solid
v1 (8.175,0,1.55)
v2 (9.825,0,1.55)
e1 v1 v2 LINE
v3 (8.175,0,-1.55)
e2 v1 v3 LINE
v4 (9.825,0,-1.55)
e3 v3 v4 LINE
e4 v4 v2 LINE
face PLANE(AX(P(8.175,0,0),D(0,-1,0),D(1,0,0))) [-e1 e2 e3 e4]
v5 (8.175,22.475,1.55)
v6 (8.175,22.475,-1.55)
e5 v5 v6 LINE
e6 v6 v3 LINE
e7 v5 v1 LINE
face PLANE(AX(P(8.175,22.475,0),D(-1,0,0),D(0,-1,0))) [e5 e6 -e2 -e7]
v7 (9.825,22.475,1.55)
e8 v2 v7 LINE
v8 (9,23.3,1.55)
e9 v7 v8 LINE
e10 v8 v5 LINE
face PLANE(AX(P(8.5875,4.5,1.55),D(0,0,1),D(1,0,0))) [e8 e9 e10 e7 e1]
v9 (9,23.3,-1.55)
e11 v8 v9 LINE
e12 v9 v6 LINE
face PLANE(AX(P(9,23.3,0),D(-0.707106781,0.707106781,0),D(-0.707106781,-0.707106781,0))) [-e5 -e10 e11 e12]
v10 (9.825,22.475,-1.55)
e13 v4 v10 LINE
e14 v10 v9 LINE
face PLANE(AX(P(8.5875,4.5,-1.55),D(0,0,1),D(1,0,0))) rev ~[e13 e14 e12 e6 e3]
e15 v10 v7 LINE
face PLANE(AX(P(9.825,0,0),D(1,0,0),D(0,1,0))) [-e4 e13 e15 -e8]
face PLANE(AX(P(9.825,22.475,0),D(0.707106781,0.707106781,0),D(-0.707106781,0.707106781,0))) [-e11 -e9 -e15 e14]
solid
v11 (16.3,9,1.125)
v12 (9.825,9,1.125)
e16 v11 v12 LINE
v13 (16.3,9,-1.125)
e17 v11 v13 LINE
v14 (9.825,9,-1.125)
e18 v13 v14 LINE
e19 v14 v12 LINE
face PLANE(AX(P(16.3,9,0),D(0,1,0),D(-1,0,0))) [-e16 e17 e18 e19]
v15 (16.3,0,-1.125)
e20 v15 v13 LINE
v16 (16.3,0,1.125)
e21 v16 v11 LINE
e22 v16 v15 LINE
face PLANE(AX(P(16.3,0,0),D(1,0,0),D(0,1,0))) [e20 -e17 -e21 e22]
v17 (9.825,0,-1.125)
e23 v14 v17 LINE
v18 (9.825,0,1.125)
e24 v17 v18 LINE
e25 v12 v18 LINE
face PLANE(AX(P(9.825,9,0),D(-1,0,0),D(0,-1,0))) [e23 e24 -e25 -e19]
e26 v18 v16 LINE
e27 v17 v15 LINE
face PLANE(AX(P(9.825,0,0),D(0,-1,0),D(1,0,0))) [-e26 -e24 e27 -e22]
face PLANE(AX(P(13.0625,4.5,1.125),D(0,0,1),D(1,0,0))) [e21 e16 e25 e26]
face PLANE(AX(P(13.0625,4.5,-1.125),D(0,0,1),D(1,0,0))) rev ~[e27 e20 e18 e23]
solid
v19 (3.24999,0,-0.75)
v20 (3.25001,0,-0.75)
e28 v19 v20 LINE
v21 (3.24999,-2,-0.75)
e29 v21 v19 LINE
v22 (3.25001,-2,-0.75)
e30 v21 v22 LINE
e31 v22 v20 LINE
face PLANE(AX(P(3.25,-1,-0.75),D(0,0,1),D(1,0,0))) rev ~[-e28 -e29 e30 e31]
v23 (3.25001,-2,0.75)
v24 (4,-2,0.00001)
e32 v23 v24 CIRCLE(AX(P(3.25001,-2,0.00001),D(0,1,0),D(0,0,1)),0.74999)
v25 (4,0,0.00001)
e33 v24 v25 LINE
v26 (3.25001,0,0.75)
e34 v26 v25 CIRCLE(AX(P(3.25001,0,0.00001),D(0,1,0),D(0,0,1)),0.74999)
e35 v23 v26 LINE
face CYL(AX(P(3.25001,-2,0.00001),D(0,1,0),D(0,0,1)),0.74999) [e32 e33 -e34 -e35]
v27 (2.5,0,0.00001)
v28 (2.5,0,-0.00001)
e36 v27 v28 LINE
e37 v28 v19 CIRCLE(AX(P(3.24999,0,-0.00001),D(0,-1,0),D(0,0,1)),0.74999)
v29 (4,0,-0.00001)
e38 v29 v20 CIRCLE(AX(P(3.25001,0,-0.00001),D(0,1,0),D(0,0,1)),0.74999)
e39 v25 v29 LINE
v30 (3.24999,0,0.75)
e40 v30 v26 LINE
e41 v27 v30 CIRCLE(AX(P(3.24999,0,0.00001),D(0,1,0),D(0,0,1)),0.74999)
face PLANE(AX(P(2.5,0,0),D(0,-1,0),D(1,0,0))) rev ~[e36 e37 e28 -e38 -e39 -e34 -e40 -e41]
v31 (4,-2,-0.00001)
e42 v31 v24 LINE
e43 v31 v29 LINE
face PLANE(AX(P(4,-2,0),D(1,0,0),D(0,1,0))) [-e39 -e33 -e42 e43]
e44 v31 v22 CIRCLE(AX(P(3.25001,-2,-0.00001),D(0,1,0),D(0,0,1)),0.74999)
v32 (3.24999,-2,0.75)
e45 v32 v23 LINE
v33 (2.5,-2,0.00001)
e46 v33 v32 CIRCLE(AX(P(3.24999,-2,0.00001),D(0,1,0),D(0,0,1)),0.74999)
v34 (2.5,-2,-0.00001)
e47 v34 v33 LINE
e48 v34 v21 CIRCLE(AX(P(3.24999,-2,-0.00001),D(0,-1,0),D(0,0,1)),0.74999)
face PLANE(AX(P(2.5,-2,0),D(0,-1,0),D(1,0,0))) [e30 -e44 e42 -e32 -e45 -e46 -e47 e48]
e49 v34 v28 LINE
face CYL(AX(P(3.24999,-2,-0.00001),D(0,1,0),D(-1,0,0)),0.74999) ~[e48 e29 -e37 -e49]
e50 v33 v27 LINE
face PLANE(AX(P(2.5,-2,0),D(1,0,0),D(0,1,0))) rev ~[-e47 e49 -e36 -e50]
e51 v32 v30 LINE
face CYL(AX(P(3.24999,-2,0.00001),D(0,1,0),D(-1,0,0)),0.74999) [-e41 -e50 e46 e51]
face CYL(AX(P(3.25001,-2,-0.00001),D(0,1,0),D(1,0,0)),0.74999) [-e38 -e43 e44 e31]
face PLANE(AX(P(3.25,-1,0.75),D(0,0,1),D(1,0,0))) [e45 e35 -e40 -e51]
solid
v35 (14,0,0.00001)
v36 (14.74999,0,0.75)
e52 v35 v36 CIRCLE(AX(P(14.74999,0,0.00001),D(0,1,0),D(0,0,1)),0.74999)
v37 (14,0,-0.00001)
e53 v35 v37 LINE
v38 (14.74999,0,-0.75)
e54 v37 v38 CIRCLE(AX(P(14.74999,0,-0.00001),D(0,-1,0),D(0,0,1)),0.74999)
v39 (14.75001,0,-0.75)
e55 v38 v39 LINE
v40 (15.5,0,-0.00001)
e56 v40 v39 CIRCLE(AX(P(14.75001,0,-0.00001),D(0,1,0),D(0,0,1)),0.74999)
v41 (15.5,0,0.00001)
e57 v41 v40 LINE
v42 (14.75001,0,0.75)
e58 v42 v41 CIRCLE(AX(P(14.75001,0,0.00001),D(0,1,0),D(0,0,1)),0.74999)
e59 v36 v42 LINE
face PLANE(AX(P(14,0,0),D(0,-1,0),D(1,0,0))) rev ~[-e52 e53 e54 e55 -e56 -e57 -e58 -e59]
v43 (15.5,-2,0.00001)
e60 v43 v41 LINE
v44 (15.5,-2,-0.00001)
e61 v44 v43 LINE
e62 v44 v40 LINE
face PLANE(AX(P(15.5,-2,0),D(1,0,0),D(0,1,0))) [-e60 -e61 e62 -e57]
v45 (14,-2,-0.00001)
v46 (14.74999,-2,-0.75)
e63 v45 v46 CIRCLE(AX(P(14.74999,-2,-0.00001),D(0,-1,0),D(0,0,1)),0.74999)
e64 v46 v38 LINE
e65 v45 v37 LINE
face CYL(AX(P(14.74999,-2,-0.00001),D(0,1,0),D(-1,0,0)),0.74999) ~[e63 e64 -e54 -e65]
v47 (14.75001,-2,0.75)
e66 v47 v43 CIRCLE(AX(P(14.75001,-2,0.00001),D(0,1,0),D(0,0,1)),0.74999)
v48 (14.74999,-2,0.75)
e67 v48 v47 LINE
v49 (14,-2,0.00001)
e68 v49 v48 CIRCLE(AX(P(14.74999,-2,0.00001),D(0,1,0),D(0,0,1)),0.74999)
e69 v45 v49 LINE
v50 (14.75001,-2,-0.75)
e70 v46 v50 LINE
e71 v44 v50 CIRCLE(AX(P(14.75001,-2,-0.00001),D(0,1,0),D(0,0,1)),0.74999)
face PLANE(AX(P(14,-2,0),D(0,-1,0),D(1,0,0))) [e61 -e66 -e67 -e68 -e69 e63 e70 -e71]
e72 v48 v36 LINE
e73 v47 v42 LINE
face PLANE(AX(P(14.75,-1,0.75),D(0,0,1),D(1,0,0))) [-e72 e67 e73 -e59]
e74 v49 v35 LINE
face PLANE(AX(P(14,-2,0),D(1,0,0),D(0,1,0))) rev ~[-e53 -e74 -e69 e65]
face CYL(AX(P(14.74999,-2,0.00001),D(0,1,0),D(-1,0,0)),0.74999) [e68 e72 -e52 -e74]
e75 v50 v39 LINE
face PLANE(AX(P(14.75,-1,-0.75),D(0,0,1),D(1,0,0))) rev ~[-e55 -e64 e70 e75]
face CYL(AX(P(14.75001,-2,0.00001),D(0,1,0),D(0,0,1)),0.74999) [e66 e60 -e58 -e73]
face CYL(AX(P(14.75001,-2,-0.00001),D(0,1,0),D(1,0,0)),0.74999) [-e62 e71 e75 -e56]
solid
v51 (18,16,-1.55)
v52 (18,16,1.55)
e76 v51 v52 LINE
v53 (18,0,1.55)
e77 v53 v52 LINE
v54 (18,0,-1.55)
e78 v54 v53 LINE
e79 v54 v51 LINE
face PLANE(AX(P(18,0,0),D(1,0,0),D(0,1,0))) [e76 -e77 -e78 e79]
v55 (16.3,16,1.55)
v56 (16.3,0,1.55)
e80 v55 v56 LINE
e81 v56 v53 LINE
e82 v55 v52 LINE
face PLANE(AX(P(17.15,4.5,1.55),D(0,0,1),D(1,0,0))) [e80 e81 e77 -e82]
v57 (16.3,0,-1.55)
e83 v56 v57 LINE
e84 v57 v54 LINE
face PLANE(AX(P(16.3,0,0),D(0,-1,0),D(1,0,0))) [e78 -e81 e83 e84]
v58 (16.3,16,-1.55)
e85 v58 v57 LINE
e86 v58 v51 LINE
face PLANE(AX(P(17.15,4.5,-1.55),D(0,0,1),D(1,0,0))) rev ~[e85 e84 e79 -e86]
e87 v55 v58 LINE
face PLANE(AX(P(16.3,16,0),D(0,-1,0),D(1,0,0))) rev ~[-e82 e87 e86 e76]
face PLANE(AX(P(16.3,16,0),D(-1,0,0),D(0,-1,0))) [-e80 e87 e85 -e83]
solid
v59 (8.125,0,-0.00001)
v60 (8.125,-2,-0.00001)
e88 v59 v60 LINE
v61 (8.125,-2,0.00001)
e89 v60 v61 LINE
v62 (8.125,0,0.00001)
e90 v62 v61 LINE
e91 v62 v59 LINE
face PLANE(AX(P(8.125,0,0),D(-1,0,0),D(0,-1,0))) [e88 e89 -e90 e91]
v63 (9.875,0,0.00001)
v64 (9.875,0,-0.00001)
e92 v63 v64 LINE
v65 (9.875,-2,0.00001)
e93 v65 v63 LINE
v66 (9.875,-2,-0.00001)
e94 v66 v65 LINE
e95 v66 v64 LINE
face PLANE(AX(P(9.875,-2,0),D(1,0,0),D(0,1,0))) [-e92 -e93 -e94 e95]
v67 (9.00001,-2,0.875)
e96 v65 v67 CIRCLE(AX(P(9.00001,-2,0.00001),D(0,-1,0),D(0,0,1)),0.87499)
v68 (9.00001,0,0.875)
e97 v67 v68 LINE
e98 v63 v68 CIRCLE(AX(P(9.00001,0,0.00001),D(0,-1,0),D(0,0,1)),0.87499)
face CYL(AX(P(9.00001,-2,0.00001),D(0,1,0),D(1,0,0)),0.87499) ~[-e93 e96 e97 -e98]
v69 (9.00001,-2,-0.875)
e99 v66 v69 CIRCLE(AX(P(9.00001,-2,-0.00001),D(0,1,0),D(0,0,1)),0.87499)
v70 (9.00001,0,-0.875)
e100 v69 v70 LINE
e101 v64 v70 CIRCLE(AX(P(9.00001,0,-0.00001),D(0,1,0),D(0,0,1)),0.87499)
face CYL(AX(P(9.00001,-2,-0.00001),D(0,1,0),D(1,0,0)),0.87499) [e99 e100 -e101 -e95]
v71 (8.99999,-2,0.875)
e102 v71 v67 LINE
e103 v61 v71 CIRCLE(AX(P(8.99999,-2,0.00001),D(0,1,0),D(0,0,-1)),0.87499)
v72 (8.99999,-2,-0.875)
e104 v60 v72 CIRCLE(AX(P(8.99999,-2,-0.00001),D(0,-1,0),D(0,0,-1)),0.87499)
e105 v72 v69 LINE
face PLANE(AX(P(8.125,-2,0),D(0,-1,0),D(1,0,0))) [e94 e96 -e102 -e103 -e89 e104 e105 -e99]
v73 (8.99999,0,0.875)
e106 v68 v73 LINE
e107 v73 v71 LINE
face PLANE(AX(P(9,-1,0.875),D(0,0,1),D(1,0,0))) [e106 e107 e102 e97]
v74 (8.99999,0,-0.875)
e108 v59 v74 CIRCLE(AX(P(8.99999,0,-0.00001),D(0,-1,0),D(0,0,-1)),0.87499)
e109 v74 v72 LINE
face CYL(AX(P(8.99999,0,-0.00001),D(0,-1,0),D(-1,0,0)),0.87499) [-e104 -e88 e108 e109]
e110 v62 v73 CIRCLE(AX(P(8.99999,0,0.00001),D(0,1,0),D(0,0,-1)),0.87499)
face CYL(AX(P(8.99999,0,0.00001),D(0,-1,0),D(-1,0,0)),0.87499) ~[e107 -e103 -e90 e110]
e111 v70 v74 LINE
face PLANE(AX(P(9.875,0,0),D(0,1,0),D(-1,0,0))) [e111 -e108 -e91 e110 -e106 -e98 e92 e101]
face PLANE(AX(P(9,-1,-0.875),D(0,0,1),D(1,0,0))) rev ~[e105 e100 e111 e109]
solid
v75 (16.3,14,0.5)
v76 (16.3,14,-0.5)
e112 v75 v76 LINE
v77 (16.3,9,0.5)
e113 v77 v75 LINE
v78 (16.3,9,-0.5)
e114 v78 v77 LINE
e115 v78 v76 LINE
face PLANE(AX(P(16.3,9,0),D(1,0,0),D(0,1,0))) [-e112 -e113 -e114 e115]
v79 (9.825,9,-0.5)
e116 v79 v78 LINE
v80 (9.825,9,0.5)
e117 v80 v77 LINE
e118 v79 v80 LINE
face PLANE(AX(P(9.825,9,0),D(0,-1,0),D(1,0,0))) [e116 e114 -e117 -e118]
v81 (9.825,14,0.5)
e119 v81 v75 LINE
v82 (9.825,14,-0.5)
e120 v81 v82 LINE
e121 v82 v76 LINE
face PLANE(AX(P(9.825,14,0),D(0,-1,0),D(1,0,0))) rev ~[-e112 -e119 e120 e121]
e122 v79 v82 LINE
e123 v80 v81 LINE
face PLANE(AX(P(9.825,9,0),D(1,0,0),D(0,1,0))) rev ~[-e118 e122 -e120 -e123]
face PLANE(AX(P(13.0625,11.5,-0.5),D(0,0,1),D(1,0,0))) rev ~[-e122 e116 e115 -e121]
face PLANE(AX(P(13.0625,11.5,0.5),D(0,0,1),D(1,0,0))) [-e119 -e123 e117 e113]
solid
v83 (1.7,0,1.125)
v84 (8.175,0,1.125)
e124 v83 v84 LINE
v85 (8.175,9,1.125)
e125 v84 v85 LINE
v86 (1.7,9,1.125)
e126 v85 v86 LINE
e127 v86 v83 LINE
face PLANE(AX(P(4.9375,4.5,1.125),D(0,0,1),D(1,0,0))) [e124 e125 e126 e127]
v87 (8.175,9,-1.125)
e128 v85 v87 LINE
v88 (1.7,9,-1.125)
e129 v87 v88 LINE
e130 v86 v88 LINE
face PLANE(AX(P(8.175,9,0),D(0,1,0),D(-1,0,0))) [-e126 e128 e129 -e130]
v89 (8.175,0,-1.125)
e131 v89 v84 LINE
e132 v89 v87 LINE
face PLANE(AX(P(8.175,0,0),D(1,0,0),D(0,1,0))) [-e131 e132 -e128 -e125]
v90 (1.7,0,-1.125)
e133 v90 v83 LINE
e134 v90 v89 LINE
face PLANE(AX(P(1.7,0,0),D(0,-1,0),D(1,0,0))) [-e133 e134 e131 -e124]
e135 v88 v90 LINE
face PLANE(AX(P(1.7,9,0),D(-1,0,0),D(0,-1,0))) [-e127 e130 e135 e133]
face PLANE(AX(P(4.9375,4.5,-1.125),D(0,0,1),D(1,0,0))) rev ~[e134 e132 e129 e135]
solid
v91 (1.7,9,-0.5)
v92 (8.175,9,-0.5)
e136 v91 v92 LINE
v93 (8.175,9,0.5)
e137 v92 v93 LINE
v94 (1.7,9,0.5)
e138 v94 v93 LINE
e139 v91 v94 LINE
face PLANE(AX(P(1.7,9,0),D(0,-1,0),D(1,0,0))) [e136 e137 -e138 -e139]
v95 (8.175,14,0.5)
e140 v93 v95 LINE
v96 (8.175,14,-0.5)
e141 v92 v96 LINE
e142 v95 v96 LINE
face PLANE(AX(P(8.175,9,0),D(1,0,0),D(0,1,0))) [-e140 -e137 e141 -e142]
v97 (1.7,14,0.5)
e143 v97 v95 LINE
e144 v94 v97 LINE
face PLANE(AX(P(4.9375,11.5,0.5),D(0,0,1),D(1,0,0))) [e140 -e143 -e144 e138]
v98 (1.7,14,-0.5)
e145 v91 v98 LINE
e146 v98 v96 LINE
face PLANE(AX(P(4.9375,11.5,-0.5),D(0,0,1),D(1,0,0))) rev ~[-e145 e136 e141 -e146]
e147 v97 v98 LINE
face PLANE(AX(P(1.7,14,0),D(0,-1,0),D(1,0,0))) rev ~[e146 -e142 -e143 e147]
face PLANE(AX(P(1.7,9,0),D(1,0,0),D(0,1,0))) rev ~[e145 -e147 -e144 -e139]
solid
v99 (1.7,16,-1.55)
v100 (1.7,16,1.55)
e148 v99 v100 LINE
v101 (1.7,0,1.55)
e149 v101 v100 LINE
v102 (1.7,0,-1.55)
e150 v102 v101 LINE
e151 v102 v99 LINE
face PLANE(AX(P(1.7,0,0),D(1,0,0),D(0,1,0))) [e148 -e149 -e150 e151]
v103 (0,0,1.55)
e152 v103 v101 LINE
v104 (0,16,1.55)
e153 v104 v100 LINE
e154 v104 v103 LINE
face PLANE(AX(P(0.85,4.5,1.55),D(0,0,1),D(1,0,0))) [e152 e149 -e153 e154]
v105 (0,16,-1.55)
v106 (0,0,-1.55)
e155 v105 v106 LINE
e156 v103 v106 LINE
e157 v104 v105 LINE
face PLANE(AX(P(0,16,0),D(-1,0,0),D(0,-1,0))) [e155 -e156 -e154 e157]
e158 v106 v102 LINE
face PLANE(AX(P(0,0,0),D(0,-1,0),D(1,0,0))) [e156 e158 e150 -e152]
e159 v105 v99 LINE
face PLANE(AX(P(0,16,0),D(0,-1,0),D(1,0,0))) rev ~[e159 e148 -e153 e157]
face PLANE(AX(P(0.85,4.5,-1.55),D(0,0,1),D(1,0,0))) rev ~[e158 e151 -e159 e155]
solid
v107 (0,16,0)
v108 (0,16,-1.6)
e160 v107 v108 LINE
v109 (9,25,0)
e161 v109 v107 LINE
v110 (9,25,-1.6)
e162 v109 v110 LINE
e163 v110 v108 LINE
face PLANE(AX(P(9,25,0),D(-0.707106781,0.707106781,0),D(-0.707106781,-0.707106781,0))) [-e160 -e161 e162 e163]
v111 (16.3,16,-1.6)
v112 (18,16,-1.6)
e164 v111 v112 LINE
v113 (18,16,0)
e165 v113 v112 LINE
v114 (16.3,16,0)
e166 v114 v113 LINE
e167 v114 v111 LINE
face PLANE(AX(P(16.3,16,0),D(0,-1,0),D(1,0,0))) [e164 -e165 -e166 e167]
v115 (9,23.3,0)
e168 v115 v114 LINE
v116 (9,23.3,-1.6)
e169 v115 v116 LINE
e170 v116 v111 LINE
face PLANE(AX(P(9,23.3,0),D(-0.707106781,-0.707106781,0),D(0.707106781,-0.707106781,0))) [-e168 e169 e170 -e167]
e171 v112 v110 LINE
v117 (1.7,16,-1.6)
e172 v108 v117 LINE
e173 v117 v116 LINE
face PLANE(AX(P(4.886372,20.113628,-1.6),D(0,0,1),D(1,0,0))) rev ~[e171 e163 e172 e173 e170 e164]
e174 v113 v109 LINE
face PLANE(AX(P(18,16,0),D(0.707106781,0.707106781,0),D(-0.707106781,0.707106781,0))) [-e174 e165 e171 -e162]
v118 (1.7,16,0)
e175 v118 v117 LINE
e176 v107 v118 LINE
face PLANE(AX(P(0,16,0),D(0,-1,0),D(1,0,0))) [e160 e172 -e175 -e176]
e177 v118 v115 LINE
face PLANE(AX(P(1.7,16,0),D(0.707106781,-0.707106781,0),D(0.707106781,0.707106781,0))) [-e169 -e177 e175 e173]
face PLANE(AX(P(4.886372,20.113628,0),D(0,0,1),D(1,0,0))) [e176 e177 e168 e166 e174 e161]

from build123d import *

# Parameters (mm, degrees)
F0_W     = 1.7
F0_H     = 9
F0_H_2   = 2
F0_H_3   = 5
F1_DEPTH = 1.55
F0_W_2   = 0.825
F2_DEPTH = 1.125
F3_DEPTH = 1.6
F0_W_3   = 6.475
F4_DEPTH = 0.5
F0_W_4   = 1.5
F5_DEPTH = 0.75
F6_DEPTH = 0.875
F7_R     = 0.87499
F8_R     = 0.74999
F8_2_R   = 0.74999


# Not quite as in the source:
# - a fillet or chamfer is up to 0.001 mm smaller than in the source, because OpenCascade refuses the exact size


with BuildPart() as f1:
    # F0 (on Top) → F1 (new body, symmetric)
    with BuildSketch(Plane.XY):
        with Locations((0.85, 4.5)):
            Rectangle(F0_W, F0_H)
        with Locations((0.85, 15)):
            Rectangle(F0_W, F0_H_2)
        with Locations((0.85, 11.5)):
            Rectangle(F0_W, F0_H_3)
    extrude(amount=F1_DEPTH, both=True)


with BuildPart() as f1b:
    # F0 (on Top) → F1, piece 2 (new body, symmetric)
    with BuildSketch(Plane.XY):
        with Locations((17.15, 4.5)):
            Rectangle(F0_W, F0_H)
        with Locations((17.15, 15)):
            Rectangle(F0_W, F0_H_2)
        with Locations((17.15, 11.5)):
            Rectangle(F0_W, F0_H_3)
    extrude(amount=F1_DEPTH, both=True)


with BuildPart() as f1c:
    # F0 (on Top) → F1, piece 3 (new body, symmetric)
    with BuildSketch(Plane.XY):
        with Locations((8.5875, 4.5)):
            Rectangle(F0_W_2, F0_H)
        with Locations((9.4125, 4.5)):
            Rectangle(F0_W_2, F0_H)
        with Locations((9.4125, 11.5)):
            Rectangle(F0_W_2, F0_H_3)
        with Locations((8.5875, 11.5)):
            Rectangle(F0_W_2, F0_H_3)
        Polygon((8.175, 22.475), (8.175, 14), (9, 14), (9, 23.3), align=None)
        Polygon((9, 23.3), (9, 14), (9.825, 14), (9.825, 22.475), align=None)
    extrude(amount=F1_DEPTH, both=True)


with BuildPart() as f2:
    # F0 (on Top) → F2 (new body, symmetric)
    with BuildSketch(Plane.XY):
        Polygon((1.7, 9), (1.7, 0), (2.5, 0), (4, 0), (8.125, 0), (8.175, 0), (8.175, 9), align=None)
    extrude(amount=F2_DEPTH, both=True)


with BuildPart() as f2b:
    # F0 (on Top) → F2, piece 2 (new body, symmetric)
    with BuildSketch(Plane.XY):
        Polygon((16.3, 9), (9.825, 9), (9.825, 0), (9.875, 0), (14, 0), (15.5, 0), (16.3, 0), align=None)
    extrude(amount=F2_DEPTH, both=True)


with BuildPart() as f3:
    # F0 (on Top) → F3 (new body)
    with BuildSketch(Plane.XY):
        Polygon((9, 25), (0, 16), (1.7, 16), (8.175, 22.475), (9, 23.3), align=None)
        Polygon((18, 16), (9, 25), (9, 23.3), (9.825, 22.475), (16.3, 16), align=None)
    extrude(amount=-F3_DEPTH)


with BuildPart() as f4:
    # F0 (on Top) → F4 (new body, symmetric)
    with BuildSketch(Plane.XY):
        with Locations((4.9375, 11.5)):
            Rectangle(F0_W_3, F0_H_3)
    extrude(amount=F4_DEPTH, both=True)


with BuildPart() as f4b:
    # F0 (on Top) → F4, piece 2 (new body, symmetric)
    with BuildSketch(Plane.XY):
        with Locations((13.0625, 11.5)):
            Rectangle(F0_W_3, F0_H_3)
    extrude(amount=F4_DEPTH, both=True)


with BuildPart() as f5:
    # F0 (on Top) → F5 (new body, symmetric)
    with BuildSketch(Plane.XY):
        with Locations((3.25, -1)):
            Rectangle(F0_W_4, F0_H_2)
    extrude(amount=F5_DEPTH, both=True)

    # F8#2 (radius 0.75 in the source; OpenCascade refuses exactly that, so slightly less here)
    f8_2_edges = [f5.edges().sort_by_distance(p)[0] for p in [
        (2.5, -1, 0.75),
        (4, -1, 0.75),
        (2.5, -1, -0.75),
        (4, -1, -0.75),
    ]]
    fillet(f8_2_edges, radius=F8_2_R)


with BuildPart() as f5b:
    # F0 (on Top) → F5, piece 2 (new body, symmetric)
    with BuildSketch(Plane.XY):
        with Locations((14.75, -1)):
            Rectangle(F0_W_4, F0_H_2)
    extrude(amount=F5_DEPTH, both=True)

    # F8 (radius 0.75 in the source; OpenCascade refuses exactly that, so slightly less here)
    f8_edges = [f5b.edges().sort_by_distance(p)[0] for p in [
        (14, -1, 0.75),
        (15.5, -1, 0.75),
        (15.5, -1, -0.75),
        (14, -1, -0.75),
    ]]
    fillet(f8_edges, radius=F8_R)


with BuildPart() as f6:
    # F0 (on Top) → F6 (new body, symmetric)
    with BuildSketch(Plane.XY):
        Polygon((8.175, 0), (8.125, 0), (8.125, -2), (9.875, -2), (9.875, 0), (9.825, 0), (9, 0), align=None)
    extrude(amount=F6_DEPTH, both=True)

    # F7 (radius 0.875 in the source; OpenCascade refuses exactly that, so slightly less here)
    f7_edges = [f6.edges().sort_by_distance(p)[0] for p in [
        (9.875, -1, -0.875),
        (8.125, -1, -0.875),
        (9.875, -1, 0.875),
        (8.125, -1, 0.875),
    ]]
    fillet(f7_edges, radius=F7_R)


solid = Compound([f1.part, f1b.part, f1c.part, f2.part, f2b.part, f3.part, f4.part, f4b.part, f5.part, f5b.part, f6.part])
